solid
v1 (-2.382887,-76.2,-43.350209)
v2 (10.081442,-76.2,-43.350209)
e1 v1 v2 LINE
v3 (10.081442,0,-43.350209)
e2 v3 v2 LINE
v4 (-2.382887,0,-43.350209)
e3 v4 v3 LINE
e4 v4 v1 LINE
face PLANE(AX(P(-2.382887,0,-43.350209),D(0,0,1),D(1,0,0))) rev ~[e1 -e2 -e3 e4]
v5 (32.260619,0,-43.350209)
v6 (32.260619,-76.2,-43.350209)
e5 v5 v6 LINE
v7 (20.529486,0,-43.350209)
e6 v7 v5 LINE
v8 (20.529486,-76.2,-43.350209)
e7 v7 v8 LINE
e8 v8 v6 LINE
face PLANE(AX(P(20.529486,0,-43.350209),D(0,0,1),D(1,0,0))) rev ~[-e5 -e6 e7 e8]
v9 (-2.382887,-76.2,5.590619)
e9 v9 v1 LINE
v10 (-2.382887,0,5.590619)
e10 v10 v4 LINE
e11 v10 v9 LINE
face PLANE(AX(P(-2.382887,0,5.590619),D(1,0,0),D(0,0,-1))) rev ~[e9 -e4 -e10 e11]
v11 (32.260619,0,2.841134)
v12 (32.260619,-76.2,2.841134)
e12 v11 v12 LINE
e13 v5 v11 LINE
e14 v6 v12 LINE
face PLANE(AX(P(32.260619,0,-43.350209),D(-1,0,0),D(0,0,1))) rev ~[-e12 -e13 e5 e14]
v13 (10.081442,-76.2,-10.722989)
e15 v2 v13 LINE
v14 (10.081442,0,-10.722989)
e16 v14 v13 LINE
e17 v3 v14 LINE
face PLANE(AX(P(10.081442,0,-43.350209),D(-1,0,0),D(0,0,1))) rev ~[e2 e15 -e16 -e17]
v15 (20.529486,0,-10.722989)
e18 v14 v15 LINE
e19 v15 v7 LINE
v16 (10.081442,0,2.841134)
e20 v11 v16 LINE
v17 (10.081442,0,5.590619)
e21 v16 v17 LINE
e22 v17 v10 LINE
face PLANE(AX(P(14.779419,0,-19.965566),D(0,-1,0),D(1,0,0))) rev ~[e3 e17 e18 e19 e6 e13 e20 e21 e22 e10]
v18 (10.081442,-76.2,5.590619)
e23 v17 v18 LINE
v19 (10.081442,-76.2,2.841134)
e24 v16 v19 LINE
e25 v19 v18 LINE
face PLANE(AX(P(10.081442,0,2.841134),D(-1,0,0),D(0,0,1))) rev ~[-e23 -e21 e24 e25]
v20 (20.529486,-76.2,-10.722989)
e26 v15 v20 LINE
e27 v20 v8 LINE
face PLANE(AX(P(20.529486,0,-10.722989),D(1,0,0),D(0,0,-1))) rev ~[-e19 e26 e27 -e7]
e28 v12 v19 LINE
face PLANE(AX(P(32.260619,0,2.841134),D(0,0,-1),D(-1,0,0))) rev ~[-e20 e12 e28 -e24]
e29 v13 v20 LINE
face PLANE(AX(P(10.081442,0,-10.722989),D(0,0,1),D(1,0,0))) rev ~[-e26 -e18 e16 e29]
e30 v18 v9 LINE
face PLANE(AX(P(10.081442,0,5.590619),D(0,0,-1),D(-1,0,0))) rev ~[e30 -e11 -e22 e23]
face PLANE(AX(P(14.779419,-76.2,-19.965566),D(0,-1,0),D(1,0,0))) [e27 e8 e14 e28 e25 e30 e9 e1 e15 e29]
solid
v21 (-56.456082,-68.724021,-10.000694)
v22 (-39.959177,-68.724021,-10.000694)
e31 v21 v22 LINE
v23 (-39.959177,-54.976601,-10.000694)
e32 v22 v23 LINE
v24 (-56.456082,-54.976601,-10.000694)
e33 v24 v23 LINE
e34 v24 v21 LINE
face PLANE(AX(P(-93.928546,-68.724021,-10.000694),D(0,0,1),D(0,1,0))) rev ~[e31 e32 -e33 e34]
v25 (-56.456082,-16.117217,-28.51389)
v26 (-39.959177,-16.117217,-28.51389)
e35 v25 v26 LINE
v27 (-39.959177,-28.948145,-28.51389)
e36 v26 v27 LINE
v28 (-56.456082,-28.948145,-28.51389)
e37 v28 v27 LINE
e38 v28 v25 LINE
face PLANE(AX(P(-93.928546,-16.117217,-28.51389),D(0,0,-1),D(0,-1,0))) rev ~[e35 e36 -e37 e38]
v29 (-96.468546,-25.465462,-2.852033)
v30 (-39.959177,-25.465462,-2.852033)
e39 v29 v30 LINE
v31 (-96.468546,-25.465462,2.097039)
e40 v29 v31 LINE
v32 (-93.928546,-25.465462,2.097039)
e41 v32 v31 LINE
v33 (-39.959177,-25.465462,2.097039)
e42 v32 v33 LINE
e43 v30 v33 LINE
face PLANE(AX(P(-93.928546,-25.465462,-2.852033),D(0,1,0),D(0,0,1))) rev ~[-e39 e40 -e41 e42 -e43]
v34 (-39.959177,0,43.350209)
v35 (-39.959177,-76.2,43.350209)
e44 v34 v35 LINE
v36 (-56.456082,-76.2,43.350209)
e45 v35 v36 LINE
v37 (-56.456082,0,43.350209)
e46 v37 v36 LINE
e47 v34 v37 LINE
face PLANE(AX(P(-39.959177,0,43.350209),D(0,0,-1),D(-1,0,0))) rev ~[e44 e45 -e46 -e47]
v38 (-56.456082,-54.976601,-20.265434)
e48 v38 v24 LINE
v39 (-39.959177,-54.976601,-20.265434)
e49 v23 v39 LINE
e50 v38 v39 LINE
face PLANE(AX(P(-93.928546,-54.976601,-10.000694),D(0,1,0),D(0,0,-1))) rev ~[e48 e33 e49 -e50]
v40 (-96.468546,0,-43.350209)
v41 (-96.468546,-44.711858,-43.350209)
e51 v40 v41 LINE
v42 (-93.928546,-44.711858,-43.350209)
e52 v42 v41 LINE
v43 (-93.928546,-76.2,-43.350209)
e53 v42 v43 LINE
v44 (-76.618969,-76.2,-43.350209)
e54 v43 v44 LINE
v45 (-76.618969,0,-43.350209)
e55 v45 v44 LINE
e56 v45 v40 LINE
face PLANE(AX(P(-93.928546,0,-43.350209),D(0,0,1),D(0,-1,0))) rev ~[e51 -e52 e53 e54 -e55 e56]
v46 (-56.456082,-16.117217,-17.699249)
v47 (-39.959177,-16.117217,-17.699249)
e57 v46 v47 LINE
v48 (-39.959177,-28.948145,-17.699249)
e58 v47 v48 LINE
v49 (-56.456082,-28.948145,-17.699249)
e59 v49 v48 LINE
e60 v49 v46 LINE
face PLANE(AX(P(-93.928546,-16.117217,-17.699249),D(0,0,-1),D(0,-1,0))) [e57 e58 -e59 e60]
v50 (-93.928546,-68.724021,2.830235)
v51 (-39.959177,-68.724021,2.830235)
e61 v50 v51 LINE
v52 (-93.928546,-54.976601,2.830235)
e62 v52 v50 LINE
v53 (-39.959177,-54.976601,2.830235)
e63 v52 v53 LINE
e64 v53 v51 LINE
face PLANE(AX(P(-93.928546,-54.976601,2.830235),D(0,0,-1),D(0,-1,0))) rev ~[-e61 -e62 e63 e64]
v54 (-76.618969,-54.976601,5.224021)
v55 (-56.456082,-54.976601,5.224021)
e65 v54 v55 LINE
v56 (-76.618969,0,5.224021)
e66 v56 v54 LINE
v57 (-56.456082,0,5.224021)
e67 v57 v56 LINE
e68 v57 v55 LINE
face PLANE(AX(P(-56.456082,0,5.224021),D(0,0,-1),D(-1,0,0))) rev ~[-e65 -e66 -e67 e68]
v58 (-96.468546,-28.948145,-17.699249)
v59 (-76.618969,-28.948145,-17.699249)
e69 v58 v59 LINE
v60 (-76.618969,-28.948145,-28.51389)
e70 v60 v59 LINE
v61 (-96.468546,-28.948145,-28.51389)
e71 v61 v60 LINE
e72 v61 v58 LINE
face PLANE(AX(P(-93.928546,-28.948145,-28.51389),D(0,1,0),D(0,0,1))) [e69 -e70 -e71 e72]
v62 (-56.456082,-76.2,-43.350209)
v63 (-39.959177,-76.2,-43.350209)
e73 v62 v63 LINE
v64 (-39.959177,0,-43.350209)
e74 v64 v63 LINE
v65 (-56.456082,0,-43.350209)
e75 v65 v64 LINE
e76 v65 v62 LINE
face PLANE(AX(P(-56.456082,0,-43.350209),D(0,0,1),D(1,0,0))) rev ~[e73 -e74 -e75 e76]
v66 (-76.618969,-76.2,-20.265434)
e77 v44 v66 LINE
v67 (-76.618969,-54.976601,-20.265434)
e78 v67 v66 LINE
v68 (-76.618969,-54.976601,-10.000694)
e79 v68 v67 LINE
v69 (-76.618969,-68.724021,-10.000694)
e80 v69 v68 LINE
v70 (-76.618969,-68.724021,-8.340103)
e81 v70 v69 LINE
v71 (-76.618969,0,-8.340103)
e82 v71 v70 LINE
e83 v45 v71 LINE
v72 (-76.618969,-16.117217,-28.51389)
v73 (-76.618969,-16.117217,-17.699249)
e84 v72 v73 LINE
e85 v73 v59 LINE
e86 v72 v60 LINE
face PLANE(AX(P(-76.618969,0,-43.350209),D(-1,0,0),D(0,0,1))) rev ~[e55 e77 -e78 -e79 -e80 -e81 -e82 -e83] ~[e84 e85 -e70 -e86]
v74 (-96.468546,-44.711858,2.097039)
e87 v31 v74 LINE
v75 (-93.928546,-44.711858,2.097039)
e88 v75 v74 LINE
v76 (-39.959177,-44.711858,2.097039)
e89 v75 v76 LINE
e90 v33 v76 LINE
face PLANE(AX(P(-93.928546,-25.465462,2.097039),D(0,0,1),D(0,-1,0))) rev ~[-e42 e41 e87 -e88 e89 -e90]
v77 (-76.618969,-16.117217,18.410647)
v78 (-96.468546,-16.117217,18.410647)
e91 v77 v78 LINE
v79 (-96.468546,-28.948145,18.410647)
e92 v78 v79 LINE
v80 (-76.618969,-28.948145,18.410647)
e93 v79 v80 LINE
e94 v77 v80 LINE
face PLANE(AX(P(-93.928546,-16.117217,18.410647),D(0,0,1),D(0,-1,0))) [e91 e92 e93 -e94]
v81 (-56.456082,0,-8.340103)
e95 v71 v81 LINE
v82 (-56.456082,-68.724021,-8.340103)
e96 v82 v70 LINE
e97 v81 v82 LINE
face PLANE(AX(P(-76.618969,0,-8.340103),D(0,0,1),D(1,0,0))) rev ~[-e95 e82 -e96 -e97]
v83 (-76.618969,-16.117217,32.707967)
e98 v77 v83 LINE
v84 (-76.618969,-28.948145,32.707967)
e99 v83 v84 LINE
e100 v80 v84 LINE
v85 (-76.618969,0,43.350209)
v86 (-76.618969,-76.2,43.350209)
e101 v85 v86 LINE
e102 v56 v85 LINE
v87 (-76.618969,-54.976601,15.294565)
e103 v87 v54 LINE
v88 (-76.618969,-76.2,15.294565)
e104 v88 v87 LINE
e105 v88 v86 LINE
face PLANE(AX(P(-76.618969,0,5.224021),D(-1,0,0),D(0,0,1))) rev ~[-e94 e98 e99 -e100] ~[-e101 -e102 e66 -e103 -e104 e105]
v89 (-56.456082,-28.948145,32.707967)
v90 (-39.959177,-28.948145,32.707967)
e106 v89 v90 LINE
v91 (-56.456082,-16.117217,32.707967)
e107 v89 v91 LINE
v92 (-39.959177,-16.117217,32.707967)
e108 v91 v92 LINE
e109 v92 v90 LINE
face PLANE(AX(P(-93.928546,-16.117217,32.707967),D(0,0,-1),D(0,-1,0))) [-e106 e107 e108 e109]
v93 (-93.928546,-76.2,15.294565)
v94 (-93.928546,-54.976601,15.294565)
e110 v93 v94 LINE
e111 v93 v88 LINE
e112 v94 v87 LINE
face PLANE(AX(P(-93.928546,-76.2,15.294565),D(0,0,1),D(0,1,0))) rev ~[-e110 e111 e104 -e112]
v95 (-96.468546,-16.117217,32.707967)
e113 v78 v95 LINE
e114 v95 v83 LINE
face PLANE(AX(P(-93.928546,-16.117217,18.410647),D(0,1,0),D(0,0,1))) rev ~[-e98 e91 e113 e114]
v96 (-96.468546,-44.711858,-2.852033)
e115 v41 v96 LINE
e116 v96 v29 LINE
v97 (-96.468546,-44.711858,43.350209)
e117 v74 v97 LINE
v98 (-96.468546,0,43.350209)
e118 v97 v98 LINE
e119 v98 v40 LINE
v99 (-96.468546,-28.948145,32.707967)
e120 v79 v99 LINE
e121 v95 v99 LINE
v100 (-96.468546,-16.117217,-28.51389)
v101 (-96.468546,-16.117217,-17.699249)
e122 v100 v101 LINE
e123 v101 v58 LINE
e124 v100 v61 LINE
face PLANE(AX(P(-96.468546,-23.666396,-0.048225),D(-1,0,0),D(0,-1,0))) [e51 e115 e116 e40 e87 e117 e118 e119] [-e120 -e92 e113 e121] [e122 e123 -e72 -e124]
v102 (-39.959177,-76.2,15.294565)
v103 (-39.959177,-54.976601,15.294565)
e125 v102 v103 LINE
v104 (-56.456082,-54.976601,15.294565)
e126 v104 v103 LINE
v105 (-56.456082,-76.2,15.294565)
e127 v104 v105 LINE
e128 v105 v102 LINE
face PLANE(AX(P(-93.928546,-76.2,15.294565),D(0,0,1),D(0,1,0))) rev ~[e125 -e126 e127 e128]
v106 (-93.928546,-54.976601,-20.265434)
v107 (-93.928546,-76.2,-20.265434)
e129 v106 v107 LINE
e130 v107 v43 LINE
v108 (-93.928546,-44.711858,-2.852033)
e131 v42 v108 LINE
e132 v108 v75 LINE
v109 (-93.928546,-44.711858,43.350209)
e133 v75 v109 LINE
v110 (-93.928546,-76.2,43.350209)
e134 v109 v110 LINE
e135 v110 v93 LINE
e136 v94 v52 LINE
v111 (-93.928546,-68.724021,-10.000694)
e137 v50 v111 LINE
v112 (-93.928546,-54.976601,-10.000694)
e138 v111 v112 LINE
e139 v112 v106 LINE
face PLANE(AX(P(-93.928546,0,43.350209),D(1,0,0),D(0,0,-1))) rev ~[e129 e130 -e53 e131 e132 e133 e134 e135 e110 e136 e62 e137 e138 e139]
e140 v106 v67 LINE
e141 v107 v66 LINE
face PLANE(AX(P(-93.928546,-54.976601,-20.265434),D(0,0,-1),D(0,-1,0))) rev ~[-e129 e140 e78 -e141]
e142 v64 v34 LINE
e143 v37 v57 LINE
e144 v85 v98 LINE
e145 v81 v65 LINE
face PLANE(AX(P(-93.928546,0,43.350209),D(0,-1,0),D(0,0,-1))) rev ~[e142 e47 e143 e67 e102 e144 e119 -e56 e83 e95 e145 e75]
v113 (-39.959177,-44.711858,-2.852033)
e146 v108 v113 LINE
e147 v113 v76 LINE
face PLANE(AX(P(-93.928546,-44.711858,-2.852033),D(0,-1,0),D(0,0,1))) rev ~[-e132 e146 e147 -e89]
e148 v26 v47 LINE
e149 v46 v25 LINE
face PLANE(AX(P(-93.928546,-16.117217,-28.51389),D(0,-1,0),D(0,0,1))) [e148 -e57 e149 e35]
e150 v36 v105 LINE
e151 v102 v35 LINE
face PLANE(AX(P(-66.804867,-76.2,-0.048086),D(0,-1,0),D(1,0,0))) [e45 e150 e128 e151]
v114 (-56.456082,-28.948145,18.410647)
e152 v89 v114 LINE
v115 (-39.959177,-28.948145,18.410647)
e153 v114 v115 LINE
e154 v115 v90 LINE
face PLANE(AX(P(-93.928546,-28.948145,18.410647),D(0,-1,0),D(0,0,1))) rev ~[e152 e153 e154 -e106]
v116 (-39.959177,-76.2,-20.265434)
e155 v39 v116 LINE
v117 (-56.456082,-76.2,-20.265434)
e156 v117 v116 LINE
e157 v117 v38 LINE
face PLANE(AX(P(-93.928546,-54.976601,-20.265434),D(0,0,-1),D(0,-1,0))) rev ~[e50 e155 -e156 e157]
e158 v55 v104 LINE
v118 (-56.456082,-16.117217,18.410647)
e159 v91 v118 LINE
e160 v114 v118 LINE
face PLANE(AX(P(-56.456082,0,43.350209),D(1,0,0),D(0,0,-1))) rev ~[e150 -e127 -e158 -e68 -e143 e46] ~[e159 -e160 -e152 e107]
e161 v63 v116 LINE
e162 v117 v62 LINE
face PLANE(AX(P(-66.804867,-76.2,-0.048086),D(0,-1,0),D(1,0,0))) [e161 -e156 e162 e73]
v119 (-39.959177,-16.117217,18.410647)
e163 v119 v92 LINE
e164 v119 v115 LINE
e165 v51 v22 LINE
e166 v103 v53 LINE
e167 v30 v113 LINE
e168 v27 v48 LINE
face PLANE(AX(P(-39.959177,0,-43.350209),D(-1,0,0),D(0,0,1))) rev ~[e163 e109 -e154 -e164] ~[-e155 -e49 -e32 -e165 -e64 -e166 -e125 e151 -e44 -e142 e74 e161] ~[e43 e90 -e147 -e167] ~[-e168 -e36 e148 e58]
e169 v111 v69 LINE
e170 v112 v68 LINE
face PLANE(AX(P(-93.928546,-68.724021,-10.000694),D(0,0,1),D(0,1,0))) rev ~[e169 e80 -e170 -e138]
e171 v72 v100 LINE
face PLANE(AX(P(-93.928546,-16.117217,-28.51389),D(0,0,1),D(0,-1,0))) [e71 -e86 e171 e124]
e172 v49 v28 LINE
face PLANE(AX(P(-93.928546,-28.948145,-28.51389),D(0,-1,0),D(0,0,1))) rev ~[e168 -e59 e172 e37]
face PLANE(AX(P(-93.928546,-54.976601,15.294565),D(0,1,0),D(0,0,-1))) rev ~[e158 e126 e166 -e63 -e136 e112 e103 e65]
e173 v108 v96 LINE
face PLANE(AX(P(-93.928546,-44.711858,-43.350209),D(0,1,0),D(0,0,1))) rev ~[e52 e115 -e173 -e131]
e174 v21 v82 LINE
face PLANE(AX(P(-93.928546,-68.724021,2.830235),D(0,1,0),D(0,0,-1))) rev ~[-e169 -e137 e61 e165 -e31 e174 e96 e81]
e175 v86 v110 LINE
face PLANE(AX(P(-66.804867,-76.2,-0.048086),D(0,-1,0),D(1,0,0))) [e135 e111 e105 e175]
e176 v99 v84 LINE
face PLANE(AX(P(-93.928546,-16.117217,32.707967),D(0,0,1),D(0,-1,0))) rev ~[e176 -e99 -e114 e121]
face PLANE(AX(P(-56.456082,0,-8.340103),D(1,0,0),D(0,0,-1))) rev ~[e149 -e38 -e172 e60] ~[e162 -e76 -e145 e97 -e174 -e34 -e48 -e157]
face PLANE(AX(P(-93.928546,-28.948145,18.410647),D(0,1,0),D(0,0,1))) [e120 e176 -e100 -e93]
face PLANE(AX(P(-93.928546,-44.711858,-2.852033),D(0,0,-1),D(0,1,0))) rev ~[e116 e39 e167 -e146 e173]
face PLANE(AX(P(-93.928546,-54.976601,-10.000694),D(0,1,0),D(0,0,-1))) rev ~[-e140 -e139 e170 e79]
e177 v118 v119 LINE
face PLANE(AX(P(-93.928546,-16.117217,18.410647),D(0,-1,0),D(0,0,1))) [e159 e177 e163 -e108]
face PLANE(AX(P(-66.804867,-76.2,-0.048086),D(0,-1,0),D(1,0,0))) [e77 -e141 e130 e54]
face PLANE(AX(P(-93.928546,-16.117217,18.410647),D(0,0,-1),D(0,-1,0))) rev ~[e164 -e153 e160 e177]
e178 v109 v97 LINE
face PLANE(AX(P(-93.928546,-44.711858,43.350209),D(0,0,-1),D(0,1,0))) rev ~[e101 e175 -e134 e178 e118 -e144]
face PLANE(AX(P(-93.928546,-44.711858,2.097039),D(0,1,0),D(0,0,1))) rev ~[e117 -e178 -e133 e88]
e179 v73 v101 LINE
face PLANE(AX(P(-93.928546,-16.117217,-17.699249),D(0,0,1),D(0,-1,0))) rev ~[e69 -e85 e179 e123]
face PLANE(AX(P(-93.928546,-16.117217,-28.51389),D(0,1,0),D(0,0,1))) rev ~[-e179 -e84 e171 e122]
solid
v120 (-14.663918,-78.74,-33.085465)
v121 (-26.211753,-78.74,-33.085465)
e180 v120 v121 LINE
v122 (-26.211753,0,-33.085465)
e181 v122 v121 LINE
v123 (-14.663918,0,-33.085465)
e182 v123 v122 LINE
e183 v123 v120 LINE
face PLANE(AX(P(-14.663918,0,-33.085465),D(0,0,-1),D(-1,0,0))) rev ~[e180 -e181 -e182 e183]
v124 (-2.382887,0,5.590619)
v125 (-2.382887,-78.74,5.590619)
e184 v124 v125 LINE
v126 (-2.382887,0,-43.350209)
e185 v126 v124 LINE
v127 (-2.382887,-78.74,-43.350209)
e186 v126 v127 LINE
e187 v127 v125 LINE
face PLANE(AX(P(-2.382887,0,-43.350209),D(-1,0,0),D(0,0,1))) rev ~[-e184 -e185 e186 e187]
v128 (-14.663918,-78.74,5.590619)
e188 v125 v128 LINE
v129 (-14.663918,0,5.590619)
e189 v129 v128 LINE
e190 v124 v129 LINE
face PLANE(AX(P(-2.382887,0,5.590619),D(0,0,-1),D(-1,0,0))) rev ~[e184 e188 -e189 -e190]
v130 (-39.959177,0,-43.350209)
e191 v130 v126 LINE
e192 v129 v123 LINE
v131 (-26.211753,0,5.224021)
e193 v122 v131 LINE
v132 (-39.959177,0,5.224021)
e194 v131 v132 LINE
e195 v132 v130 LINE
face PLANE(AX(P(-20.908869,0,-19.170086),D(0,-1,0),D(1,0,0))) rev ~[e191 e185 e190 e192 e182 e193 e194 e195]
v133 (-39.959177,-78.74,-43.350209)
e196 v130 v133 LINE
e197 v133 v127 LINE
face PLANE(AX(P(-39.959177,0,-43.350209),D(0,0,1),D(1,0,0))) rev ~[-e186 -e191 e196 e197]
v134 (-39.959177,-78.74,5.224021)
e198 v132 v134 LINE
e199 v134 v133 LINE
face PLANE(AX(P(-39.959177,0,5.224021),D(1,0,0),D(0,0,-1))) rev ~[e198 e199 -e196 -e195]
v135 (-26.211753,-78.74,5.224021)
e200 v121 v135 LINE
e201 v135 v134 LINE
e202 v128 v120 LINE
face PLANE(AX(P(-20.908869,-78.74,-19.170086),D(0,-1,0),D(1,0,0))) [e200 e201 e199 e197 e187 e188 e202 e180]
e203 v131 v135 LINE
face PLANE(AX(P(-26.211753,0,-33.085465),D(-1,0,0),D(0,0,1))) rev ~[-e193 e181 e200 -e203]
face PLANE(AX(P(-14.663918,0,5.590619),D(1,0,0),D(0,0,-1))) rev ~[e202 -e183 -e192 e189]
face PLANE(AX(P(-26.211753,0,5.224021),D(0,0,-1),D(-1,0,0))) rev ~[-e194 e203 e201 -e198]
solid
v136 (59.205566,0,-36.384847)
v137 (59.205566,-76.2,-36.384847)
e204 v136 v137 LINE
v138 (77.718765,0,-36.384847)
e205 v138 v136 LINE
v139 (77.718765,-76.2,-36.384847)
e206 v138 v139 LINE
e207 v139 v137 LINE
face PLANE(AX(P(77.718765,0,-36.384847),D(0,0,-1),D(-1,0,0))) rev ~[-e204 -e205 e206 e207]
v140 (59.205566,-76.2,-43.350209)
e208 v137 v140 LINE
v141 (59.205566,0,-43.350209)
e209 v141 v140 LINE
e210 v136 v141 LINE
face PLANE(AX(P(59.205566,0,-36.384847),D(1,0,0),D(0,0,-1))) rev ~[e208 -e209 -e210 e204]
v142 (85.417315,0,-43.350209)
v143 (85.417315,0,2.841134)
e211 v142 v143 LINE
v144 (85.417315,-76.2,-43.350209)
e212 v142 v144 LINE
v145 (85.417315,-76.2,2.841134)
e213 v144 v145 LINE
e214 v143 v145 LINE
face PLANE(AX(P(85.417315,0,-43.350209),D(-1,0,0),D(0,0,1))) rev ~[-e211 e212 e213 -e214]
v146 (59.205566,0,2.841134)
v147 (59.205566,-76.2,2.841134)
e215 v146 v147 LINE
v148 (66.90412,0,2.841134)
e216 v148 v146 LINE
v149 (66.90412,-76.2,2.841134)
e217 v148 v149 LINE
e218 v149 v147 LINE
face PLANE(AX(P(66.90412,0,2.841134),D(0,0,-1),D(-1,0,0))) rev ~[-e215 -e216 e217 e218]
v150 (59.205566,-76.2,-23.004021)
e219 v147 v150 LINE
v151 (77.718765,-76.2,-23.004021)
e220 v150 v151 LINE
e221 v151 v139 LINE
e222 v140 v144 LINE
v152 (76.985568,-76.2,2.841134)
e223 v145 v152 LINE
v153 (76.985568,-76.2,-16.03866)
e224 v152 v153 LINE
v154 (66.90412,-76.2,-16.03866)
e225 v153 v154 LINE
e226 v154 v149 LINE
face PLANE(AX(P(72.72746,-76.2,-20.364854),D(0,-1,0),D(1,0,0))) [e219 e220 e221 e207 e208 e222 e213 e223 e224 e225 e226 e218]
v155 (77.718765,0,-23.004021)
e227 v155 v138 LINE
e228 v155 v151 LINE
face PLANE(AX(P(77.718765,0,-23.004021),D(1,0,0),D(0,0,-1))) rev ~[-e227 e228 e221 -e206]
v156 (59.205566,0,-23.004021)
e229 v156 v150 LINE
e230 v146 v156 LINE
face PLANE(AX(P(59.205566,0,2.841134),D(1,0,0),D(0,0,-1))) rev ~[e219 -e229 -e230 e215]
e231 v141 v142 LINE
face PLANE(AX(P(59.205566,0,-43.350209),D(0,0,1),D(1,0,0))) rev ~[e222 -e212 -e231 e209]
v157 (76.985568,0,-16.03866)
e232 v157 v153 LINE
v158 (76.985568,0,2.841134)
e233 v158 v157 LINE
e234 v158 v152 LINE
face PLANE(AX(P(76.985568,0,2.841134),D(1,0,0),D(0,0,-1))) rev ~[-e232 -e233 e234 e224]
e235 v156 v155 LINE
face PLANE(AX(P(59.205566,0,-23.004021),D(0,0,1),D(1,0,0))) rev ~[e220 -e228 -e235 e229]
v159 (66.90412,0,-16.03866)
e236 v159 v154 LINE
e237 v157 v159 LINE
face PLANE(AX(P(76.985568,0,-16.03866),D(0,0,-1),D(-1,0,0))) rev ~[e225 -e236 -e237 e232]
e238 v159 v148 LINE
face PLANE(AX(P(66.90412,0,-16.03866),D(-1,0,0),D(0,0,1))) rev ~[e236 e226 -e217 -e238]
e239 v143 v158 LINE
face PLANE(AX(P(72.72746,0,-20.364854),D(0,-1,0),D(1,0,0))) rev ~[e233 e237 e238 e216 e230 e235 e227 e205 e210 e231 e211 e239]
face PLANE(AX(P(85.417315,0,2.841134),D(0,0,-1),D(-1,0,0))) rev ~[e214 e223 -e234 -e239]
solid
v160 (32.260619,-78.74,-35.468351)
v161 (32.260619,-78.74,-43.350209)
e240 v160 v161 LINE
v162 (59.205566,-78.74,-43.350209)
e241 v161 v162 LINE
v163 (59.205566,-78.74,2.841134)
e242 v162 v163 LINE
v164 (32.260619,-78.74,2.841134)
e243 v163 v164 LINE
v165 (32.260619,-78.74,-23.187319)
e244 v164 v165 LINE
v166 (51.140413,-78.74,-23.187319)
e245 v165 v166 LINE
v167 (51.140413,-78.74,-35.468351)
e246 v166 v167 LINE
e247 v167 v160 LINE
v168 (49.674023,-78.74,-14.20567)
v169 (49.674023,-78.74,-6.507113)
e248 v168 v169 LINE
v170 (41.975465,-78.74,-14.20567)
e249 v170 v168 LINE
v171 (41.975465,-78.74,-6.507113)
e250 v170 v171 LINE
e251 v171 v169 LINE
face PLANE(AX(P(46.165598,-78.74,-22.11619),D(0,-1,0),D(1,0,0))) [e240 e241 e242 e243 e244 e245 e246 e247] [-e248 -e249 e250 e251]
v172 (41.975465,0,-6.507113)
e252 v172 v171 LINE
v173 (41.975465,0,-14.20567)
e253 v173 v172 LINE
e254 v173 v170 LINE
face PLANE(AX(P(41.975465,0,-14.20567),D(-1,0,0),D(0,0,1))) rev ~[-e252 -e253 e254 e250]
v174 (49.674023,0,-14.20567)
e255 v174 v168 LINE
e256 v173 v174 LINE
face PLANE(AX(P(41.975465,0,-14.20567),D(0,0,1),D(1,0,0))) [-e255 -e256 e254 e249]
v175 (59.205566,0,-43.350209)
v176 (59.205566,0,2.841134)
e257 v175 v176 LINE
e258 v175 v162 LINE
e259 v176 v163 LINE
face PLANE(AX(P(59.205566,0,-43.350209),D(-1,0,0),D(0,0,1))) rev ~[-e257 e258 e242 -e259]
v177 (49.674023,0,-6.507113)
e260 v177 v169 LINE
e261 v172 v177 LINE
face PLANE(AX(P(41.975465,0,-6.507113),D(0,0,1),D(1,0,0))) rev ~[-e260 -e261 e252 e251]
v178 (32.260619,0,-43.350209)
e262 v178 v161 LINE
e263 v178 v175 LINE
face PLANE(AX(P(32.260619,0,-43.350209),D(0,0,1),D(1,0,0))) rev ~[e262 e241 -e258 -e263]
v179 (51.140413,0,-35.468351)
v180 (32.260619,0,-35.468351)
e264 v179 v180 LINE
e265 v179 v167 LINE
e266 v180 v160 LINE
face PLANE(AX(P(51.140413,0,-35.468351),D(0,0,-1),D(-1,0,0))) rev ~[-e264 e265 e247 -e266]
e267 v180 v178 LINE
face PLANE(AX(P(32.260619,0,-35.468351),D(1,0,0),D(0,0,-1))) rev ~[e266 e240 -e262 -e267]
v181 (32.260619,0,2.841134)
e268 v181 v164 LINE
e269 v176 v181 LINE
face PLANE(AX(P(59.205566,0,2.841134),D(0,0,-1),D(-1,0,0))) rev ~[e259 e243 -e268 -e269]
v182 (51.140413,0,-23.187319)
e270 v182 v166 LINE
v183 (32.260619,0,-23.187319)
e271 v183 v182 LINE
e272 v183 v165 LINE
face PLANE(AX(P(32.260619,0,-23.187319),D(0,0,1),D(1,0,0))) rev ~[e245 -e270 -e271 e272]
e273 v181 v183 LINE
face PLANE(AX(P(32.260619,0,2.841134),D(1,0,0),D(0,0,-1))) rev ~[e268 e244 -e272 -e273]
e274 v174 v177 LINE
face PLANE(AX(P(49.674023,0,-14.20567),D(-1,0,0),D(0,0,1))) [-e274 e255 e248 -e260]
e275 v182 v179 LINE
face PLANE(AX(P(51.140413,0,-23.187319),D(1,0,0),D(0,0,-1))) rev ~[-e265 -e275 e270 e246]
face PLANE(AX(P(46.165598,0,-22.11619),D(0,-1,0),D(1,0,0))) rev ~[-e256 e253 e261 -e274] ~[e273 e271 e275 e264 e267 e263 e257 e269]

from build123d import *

# Parameters (mm, degrees)
F1_DEPTH = 76.2
F2_DEPTH = 78.74
F0_W     = 7.6985582709
F0_H     = 7.6985568739
F3_W     = 19.2463956773
F3_H     = 4.9490719102
F3_W_2   = 12.830927968
F3_H_2   = 14.2973195761
F3_H_3   = 10.814640671
F4_DEPTH = 179.3468610773
F5_DEPTH = 2.54


with BuildPart() as f1:
    # F0 (on Front) → F1 (new body)
    with BuildSketch(Plane.XZ):
        Polygon((-93.9285457134, 43.3502085507), (-93.9285457134, -43.3502085507), (-76.6189694405, -43.3502085507), (-76.6189694405, -8.3401026204), (-56.4560815692, -8.3401026204), (-56.4560815692, -43.3502085507), (-39.9591773748, -43.3502085507), (-39.9591773748, 5.224020686), (-39.9591773748, 43.3502085507), (-56.4560815692, 43.3502085507), (-56.4560815692, 5.224020686), (-76.6189694405, 5.224020686), (-76.6189694405, 43.3502085507), align=None)
    extrude(amount=F1_DEPTH)

    # F3 (on face) → F4 (cut, through all)
    with BuildSketch(Plane(origin=(-93.9285457134, 0, 0), x_dir=(0, -1, 0), z_dir=(-1, 0, 0))):
        with Locations((35.0886601955, -0.377497403)):
            Rectangle(F3_W, F3_H)
        Polygon((76.2, -20.2654339373), (76.2, 15.2945648879), (54.9766011536, 15.2945648879), (54.9766011536, 2.8302345891), (68.7240213156, 2.8302345891), (68.7240213156, -10.0006936118), (54.9766011536, -10.0006936118), (54.9766011536, -20.2654339373), align=None)
        with Locations((22.5326810032, 25.559307076)):
            Rectangle(F3_W_2, F3_H_2)
        with Locations((22.5326810032, -23.1065694243)):
            Rectangle(F3_W_2, F3_H_3)
    extrude(amount=-F4_DEPTH, mode=Mode.SUBTRACT)

    # F3 (on face) → F5 (join)
    with BuildSketch(Plane(origin=(-93.9285457134, 0, 0), x_dir=(0, -1, 0), z_dir=(-1, 0, 0))):
        Polygon((44.7118580341, 43.3502085507), (0, 43.3502085507), (0, -43.3502085507), (44.7118580341, -43.3502085507), (44.7118580341, -2.8520333581), (25.4654623568, -2.8520333581), (25.4654623568, 2.0970385522), (44.7118580341, 2.0970385522), align=None)
        with Locations((22.5326810032, -23.1065694243)):
            Rectangle(F3_W_2, F3_H_3, mode=Mode.SUBTRACT)
        with Locations((22.5326810032, 25.559307076)):
            Rectangle(F3_W_2, F3_H_2, mode=Mode.SUBTRACT)
    extrude(amount=F5_DEPTH)


with BuildPart() as f1b:
    # F0 (on Front) → F1, piece 2 (new body)
    with BuildSketch(Plane.XZ):
        Polygon((-2.3828870617, 5.590618588), (-2.3828870617, -43.3502085507), (10.081442073, -43.3502085507), (10.081442073, -10.7229892164), (20.529486239, -10.7229892164), (20.529486239, -43.3502085507), (32.2606191039, -43.3502085507), (32.2606191039, -35.4683510959), (32.2606191039, -23.1873188168), (32.2606191039, -10.7229892164), (32.2606191039, 2.8411338571), (10.081442073, 2.8411338571), (10.081442073, 5.590618588), align=None)
    extrude(amount=F1_DEPTH)


with BuildPart() as f1c:
    # F0 (on Front) → F1, piece 3 (new body)
    with BuildSketch(Plane.XZ):
        Polygon((66.9041201472, 2.8411338571), (59.2055656016, 2.8411338571), (59.2055656016, -23.0040214956), (77.7187645435, -23.0040214956), (77.7187645435, -36.3848470151), (59.2055656016, -36.3848470151), (59.2055656016, -43.3502085507), (77.7187645435, -43.3502085507), (85.4173153639, -43.3502085507), (85.4173153639, -23.0040214956), (85.4173153639, 2.8411338571), (76.9855678082, 2.8411338571), (76.9855678082, -16.03865996), (66.9041201472, -16.03865996), align=None)
    extrude(amount=F1_DEPTH)


with BuildPart() as f2:
    # F0 (on Front) → F2 (new body)
    with BuildSketch(Plane.XZ):
        Polygon((-39.9591773748, 5.224020686), (-39.9591773748, -43.3502085507), (-26.2117534876, -43.3502085507), (-14.6639179438, -43.3502085507), (-2.3828870617, -43.3502085507), (-2.3828870617, 5.590618588), (-14.6639179438, 5.590618588), (-14.6639179438, -33.0854654312), (-26.2117534876, -33.0854654312), (-26.2117534876, 5.224020686), align=None)
    extrude(amount=F2_DEPTH)


with BuildPart() as f2b:
    # F0 (on Front) → F2, piece 2 (new body)
    with BuildSketch(Plane.XZ):
        Polygon((59.2055656016, 2.8411338571), (32.2606191039, 2.8411338571), (32.2606191039, -10.7229892164), (32.2606191039, -23.1873188168), (51.1404126883, -23.1873188168), (51.1404126883, -35.4683510959), (32.2606191039, -35.4683510959), (32.2606191039, -43.3502085507), (51.1404126883, -43.3502085507), (59.2055656016, -43.3502085507), (59.2055656016, -36.3848470151), (59.2055656016, -23.1873188168), (59.2055656016, -23.0040214956), align=None)
        with Locations((45.8247438073, -10.3563915472)):
            Rectangle(F0_W, F0_H, mode=Mode.SUBTRACT)
    extrude(amount=F2_DEPTH)


solid = Compound([f1.part, f1b.part, f1c.part, f2.part, f2b.part])
